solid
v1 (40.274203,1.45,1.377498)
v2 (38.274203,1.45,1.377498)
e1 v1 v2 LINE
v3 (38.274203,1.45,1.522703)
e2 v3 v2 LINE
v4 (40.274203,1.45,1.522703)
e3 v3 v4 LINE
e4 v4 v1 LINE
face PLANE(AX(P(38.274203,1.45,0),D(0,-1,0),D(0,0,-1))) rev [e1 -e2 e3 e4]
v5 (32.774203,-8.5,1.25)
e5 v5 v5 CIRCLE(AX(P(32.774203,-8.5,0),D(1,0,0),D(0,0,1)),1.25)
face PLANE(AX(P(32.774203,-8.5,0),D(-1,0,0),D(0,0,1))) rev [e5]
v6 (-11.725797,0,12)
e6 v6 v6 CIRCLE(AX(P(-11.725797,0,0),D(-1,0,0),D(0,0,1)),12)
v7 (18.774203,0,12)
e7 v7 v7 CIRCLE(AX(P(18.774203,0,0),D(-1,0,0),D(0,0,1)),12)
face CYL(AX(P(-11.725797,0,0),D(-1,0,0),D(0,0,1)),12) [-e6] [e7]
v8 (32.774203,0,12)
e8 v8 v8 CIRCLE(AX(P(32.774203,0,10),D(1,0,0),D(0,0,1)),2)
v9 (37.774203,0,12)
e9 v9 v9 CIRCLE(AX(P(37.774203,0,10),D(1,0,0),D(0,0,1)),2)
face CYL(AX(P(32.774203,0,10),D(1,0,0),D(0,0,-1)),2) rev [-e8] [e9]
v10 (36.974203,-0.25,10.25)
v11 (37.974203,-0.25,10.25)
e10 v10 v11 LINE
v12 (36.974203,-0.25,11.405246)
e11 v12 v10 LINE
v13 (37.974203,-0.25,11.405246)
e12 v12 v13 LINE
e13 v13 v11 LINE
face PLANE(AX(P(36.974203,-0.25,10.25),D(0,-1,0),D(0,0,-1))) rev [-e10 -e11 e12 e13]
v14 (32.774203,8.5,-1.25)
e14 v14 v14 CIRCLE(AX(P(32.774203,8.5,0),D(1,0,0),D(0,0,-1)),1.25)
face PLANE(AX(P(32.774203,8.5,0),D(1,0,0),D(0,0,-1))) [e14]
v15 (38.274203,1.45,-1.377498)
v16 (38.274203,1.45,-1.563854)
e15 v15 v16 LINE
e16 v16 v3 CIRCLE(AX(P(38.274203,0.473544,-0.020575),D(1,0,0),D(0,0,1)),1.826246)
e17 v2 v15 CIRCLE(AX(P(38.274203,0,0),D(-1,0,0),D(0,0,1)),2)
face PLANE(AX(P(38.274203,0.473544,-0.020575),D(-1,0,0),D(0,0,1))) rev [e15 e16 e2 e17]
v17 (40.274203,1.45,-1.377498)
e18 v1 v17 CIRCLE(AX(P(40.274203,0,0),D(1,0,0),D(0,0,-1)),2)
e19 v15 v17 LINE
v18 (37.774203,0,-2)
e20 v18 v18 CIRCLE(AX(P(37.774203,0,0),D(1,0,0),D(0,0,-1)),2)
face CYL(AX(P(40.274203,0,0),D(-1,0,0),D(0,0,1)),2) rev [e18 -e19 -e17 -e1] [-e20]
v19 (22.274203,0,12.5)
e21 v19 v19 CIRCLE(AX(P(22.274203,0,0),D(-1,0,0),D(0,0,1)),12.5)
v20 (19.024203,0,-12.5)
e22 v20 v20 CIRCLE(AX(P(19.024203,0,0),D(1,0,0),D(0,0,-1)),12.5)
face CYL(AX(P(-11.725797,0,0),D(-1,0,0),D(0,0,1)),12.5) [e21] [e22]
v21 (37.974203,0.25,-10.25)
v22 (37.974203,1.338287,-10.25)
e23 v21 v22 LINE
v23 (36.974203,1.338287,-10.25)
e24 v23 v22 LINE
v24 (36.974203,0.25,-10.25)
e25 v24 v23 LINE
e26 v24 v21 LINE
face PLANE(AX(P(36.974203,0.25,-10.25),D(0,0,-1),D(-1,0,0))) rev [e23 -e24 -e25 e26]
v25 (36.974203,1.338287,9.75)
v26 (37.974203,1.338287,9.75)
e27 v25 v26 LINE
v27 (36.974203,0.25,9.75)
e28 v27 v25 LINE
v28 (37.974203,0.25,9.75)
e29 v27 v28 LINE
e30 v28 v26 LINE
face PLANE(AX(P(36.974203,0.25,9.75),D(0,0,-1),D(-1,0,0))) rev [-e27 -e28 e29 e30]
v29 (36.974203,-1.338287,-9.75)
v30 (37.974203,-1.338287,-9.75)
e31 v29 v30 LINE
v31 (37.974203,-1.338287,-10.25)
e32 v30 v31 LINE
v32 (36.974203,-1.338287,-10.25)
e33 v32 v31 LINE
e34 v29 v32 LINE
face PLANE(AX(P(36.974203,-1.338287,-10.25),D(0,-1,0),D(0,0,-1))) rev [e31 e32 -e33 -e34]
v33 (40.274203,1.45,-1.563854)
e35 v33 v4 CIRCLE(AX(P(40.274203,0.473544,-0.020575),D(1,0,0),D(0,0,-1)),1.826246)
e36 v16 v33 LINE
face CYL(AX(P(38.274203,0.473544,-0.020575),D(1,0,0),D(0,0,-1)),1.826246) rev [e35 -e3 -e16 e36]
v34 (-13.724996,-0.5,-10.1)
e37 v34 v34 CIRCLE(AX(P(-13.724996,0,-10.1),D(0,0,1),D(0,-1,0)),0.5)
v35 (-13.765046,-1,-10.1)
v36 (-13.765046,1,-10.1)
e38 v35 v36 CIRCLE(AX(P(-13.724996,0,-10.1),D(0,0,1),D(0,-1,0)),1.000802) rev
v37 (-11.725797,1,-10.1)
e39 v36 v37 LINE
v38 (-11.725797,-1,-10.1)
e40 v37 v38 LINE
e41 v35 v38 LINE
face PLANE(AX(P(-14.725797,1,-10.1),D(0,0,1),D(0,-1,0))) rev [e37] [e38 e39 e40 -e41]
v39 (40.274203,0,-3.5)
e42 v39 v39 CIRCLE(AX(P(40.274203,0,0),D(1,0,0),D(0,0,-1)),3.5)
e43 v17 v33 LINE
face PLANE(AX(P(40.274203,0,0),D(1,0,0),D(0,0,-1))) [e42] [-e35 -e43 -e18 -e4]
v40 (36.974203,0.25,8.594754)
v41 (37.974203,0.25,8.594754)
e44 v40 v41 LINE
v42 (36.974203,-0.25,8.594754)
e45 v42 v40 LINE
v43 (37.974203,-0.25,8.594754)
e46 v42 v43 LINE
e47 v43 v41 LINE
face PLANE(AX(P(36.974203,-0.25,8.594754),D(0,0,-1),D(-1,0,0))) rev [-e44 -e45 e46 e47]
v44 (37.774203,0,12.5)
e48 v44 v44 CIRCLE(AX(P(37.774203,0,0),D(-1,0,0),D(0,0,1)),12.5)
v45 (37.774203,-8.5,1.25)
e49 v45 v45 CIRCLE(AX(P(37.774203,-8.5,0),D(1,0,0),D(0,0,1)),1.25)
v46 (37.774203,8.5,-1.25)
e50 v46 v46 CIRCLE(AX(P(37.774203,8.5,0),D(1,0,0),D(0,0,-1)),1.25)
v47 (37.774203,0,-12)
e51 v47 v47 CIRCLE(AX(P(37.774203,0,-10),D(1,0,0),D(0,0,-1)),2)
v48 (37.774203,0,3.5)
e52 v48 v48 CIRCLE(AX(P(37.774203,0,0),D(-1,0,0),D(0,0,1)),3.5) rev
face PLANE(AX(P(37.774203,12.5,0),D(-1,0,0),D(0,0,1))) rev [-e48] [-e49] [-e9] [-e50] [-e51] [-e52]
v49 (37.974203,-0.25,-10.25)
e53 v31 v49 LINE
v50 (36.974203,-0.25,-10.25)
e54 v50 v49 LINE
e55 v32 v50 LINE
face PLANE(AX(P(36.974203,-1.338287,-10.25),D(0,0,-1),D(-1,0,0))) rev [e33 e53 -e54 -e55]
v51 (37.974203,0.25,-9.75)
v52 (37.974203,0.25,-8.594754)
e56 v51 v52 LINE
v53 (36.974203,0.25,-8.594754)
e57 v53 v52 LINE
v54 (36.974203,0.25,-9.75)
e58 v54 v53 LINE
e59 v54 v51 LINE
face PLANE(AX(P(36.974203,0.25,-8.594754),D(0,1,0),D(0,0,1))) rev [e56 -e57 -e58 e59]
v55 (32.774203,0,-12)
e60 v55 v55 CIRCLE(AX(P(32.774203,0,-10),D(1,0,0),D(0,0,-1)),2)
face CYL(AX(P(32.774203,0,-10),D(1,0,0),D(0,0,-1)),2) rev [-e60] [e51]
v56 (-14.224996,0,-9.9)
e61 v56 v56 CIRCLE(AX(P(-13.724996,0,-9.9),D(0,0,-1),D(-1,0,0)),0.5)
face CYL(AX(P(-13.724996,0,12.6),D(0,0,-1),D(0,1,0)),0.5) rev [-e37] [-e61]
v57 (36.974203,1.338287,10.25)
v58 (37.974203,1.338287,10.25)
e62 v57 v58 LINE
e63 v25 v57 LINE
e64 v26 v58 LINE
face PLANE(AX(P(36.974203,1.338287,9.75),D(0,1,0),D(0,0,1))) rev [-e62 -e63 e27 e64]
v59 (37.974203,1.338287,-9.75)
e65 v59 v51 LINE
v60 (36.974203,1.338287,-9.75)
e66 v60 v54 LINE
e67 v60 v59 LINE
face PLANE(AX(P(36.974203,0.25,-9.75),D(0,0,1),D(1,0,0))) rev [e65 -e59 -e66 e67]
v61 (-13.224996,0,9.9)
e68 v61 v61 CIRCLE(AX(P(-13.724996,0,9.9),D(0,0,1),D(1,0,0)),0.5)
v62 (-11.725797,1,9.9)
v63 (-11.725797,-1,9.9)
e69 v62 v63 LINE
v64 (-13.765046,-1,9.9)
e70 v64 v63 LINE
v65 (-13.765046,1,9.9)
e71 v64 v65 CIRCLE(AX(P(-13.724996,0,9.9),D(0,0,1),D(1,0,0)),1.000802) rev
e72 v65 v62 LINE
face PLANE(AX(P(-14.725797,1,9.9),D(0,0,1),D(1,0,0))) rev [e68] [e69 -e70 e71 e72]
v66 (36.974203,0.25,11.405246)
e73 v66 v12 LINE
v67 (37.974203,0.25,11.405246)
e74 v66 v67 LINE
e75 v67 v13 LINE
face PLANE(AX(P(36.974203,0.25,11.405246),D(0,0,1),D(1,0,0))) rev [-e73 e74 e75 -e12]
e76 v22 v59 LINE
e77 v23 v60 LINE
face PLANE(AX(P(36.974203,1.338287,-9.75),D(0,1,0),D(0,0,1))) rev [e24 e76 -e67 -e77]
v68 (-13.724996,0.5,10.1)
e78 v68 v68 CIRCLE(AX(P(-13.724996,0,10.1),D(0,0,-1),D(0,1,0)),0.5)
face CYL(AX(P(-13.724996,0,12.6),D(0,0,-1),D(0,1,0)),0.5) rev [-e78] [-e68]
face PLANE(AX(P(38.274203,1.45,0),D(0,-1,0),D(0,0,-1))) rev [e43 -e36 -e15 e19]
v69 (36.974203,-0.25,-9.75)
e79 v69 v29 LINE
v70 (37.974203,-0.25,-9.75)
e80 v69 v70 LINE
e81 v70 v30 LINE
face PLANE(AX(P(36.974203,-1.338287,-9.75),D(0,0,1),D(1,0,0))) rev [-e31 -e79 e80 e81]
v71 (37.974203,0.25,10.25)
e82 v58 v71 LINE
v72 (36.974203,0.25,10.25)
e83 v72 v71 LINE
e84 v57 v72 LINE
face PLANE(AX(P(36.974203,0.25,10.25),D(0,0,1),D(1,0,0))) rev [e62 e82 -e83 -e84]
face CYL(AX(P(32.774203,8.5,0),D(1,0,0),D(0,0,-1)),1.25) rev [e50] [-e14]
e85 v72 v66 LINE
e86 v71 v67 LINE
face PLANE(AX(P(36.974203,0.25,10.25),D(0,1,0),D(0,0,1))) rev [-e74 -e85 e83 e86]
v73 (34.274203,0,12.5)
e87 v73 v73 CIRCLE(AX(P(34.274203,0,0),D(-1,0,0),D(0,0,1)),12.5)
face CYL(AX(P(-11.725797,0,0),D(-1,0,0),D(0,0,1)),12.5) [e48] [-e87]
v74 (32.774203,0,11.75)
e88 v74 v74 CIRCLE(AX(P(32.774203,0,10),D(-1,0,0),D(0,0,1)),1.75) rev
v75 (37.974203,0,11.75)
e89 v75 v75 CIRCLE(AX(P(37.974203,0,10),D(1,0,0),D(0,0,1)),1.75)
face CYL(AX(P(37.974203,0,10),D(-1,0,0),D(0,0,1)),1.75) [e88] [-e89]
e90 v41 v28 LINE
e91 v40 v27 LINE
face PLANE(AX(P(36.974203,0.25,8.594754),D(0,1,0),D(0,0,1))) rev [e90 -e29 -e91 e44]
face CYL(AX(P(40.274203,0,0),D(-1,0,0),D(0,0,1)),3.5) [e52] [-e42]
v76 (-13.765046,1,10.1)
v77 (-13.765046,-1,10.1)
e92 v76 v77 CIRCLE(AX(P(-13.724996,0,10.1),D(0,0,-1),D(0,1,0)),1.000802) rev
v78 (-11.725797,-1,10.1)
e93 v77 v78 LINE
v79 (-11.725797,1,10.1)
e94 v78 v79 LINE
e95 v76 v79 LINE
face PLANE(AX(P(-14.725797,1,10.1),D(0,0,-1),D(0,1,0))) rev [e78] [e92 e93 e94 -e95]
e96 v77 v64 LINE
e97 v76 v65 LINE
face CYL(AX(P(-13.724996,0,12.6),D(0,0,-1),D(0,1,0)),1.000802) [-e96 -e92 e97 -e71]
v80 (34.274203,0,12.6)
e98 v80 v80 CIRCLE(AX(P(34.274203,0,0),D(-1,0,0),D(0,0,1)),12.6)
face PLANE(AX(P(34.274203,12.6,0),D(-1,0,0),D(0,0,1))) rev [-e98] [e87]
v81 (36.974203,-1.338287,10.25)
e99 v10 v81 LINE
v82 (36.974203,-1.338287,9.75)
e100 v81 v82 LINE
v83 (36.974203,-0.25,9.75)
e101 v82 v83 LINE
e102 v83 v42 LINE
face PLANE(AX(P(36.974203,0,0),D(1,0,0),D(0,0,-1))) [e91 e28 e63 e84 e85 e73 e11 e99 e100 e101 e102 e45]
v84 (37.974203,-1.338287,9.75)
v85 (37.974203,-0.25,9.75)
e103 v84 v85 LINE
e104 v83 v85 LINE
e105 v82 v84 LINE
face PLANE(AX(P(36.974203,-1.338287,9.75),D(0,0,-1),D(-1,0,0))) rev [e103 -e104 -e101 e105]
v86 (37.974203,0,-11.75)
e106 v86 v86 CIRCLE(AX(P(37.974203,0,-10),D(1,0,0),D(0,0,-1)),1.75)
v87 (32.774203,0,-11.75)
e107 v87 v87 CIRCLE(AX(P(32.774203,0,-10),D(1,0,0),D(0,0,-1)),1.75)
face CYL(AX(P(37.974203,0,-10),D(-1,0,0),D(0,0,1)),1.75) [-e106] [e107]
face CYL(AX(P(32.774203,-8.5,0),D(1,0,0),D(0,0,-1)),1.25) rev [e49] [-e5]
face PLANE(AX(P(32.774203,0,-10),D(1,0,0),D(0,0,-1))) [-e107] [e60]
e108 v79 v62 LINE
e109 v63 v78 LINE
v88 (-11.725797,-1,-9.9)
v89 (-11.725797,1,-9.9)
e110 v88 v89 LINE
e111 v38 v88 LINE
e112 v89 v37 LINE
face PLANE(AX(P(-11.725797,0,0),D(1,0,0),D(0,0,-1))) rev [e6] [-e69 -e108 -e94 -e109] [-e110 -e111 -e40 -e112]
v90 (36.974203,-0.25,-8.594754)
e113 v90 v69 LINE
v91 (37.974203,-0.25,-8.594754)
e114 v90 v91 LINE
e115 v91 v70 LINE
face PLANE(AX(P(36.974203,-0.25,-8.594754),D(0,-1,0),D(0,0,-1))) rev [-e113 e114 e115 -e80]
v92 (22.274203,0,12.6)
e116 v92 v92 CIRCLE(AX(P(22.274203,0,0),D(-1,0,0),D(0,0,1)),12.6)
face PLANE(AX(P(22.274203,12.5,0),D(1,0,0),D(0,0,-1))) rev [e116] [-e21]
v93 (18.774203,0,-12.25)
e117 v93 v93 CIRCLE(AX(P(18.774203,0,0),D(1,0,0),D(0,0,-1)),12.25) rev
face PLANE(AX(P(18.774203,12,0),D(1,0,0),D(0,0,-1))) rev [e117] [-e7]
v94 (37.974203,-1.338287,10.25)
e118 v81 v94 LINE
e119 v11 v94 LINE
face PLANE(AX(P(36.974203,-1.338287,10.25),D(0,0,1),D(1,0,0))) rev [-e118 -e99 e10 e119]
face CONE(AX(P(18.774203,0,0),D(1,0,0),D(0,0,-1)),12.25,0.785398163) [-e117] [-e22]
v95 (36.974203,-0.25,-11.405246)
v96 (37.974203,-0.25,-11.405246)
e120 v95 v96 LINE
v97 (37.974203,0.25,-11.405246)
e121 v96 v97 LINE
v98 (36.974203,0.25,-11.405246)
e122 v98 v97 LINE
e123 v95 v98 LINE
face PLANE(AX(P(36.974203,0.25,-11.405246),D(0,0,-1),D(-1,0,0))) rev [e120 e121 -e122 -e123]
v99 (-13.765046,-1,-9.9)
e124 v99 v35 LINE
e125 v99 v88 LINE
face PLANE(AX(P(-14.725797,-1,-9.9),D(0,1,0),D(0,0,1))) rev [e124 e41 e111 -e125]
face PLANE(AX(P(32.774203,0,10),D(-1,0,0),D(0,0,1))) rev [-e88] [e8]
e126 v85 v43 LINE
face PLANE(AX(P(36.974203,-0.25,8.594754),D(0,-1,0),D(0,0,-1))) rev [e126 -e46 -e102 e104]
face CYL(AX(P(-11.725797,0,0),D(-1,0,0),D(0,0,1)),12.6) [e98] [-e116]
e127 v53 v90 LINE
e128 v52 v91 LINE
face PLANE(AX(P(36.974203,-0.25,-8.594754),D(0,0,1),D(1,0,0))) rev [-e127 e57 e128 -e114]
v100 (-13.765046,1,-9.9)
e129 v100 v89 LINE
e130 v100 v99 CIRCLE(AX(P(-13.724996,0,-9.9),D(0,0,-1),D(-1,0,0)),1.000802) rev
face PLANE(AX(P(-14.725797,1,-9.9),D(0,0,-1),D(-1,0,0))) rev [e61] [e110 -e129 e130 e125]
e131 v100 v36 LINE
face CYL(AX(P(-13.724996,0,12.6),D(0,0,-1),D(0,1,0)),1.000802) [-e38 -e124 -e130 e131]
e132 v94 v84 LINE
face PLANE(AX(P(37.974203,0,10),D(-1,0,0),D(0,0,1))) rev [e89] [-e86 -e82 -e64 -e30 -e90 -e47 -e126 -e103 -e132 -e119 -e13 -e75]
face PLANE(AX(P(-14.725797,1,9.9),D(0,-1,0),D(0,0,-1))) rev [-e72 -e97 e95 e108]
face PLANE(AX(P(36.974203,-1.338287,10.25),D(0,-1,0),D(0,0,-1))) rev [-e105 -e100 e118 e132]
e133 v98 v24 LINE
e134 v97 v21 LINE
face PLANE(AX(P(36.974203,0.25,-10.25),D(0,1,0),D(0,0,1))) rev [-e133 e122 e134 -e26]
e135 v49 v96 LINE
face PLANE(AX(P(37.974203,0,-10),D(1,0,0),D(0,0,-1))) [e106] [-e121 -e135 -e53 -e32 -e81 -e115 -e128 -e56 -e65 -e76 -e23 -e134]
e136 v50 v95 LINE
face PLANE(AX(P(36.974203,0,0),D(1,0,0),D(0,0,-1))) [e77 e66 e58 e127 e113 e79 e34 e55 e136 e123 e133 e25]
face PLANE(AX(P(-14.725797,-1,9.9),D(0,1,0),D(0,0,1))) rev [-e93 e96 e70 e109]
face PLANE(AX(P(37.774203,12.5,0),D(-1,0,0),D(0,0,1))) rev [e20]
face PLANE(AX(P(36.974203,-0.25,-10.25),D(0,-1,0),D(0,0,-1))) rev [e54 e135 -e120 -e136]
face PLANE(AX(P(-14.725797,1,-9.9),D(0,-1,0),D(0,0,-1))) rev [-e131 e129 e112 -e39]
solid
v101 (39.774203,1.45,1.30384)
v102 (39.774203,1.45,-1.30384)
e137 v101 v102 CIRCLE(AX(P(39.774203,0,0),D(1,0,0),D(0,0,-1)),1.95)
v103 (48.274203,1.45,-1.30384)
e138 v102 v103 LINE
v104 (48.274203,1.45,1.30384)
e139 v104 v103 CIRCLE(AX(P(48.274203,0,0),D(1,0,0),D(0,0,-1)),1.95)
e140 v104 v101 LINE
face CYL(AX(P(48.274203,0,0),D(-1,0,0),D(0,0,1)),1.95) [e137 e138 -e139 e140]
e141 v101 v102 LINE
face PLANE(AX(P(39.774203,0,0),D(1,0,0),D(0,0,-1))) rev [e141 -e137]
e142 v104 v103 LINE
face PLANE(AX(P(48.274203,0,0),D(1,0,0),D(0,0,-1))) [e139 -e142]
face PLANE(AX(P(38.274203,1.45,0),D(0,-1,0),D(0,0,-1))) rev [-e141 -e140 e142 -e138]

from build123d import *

# Parameters (mm, degrees)
SKETCH3_R               = 3.5
SKETCH3_R_2             = 2
BOSS_EXTRUDE1_DEPTH     = 2.5
BOSS_EXTRUDE2_START     = 2
SKETCH4_R               = 1.95
BOSS_EXTRUDE2_DEPTH     = 8.5
CUT_EXTRUDE1_DEPTH      = 10
CHAMFER1_SIZE           = 0.25
SKETCH6_R               = 2
CUT_EXTRUDE2_DEPTH      = 5
SKETCH7_R               = 1.75
BOSS_EXTRUDE3_DEPTH     = 5.2
CUT_EXTRUDE4_DEPTH      = 1
SKETCH9_R               = 1.25
CUT_EXTRUDE5_DEPTH      = 5
SKETCH11_W              = 0.2
SKETCH11_H              = 2
BOSS_EXTRUDE4_DEPTH     = 3
CUT_EXTRUDE6_START      = -20.2
CUT_EXTRUDE6_DEPTH      = 20.2
CUT_EXTRUDE7_DEPTH      = 55.812850986
CUT_EXTRUDE7_DEPTH_BACK = 55.812850986
SKETCH13_R              = 0.5


# Read off the part's stored shape, not the designer's step: Cut-Extrude6
with BuildPart() as part:
    # Sketch1 → Revolve1 (revolve)
    with BuildSketch(Plane.XY, mode=Mode.PRIVATE) as revolve1_sk:
        Polygon((-11.725797436, 0), (-11.725797436, 12), (18.774202564, 12), (18.774202564, 12.5), (22.274202564, 12.5), (22.274202564, 12.6), (34.274202564, 12.6), (34.274202564, 12.5), (37.774202564, 12.5), (37.774202564, 0), align=None)
    revolve(revolve1_sk.sketch.rotate(Axis((-11.725797436, 0, 0), (1, 0, 0)), 90), axis=Axis((-11.725797436, 0, 0), (1, 0, 0)))

    # Sketch3 → Boss-Extrude1 (add)
    with BuildSketch(Plane(origin=(37.774202564, 0, 0), x_dir=(0, 0, -1), z_dir=(1, 0, 0))):
        with Locations(Location((0, 0, 0), (0, 0, 180))):
            Circle(SKETCH3_R)
        Circle(SKETCH3_R_2, mode=Mode.SUBTRACT)
    extrude(amount=BOSS_EXTRUDE1_DEPTH)


with BuildPart() as body_2:
    # Sketch4 → Boss-Extrude2 (new body)
    with BuildSketch(Plane(origin=(37.774202564, 0, 0), x_dir=(0, 0, -1), z_dir=(1, 0, 0)).offset(BOSS_EXTRUDE2_START)):
        Circle(SKETCH4_R)
    extrude(amount=BOSS_EXTRUDE2_DEPTH)


with BuildPart() as cut_extrude1_tool:
    # Sketch5 → Cut-Extrude1 (new body)
    with BuildSketch(Plane(origin=(48.274202564, 0, 0), x_dir=(0, 0, -1), z_dir=(1, 0, 0))):
        with BuildLine():
            Line((0, 1.45), (1.563854219, 1.45))
            ThreePointArc((1.563854219, 1.45), (0.020575485, 2.299790468), (-1.52270325, 1.45))
            Line((-1.52270325, 1.45), (0, 1.45))
        make_face()
    extrude(amount=-CUT_EXTRUDE1_DEPTH)


with BuildPart() as part_1:
    add(part.part)

    # Cut-Extrude1: cut by cut_extrude1_tool
    add(cut_extrude1_tool.part, mode=Mode.SUBTRACT)

    # Chamfer1
    chamfer1_edges = [part_1.edges().sort_by_distance(p)[0] for p in [
        (18.774202564, 0, -12.5),
    ]]
    chamfer(chamfer1_edges, length=CHAMFER1_SIZE)

    # Sketch6 → Cut-Extrude2 (cut)
    with BuildSketch(Plane(origin=(37.774202564, 0, 0), x_dir=(0, 0, -1), z_dir=(1, 0, 0))):
        with Locations((10, 0)):
            Circle(SKETCH6_R)
        with Locations(Location((-10, 0, 0), (0, 0, 180))):
            Circle(SKETCH6_R)
    extrude(amount=-CUT_EXTRUDE2_DEPTH, mode=Mode.SUBTRACT)

    # Sketch7 → Boss-Extrude3 (add)
    with BuildSketch(Plane(origin=(32.774202564, 0, 0), x_dir=(0, 0, -1), z_dir=(1, 0, 0))):
        with Locations((10, 0)):
            Circle(SKETCH7_R)
        with Locations(Location((-10, 0, 0), (0, 0, 180))):
            Circle(SKETCH7_R)
    extrude(amount=BOSS_EXTRUDE3_DEPTH)

    # Sketch8 → Cut-Extrude4 (cut)
    with BuildSketch(Plane(origin=(37.974202564, 0, 0), x_dir=(0, 0, -1), z_dir=(1, 0, 0))):
        Polygon((8.594754122, -0.25), (8.594754122, 0.25), (9.75, 0.25), (9.75, 1.338286548), (10.25, 1.338286548), (10.25, 0.25), (11.405245878, 0.25), (11.405245878, -0.25), (10.25, -0.25), (10.25, -1.338286548), (9.75, -1.338286548), (9.75, -0.25), align=None)
        Polygon((-10.25, -0.25), (-11.405245878, -0.25), (-11.405245878, 0.25), (-10.25, 0.25), (-10.25, 1.338286548), (-9.75, 1.338286548), (-9.75, 0.25), (-8.594754122, 0.25), (-8.594754122, -0.25), (-9.75, -0.25), (-9.75, -1.338286548), (-10.25, -1.338286548), align=None)
    extrude(amount=-CUT_EXTRUDE4_DEPTH, mode=Mode.SUBTRACT)

    # Sketch9 → Cut-Extrude5 (cut)
    with BuildSketch(Plane(origin=(37.774202564, 0, 0), x_dir=(0, 0, -1), z_dir=(1, 0, 0))):
        with Locations((0, 8.5)):
            Circle(SKETCH9_R)
        with Locations(Location((0, -8.5, 0), (0, 0, 180))):
            Circle(SKETCH9_R)
    extrude(amount=-CUT_EXTRUDE5_DEPTH, mode=Mode.SUBTRACT)

    # Sketch11 → Boss-Extrude4 (add)
    with BuildSketch(Plane.ZY.offset(11.725797436)):
        with Locations((10, 0)):
            Rectangle(SKETCH11_W, SKETCH11_H)
        with Locations((-10, 0)):
            Rectangle(SKETCH11_W, SKETCH11_H)
    extrude(amount=BOSS_EXTRUDE4_DEPTH)

    # Cut-Extrude6 outline → Cut-Extrude6 (cut)
    with BuildSketch(Plane(origin=(0, 0, -10.1), x_dir=(-1, 0, 0), z_dir=(0, 0, -1)).offset(CUT_EXTRUDE6_START)):
        with BuildLine():
            ThreePointArc((13.765046185, 1), (14.446690478, 0.693369124), (14.725797436, 0))
            Line((14.725797436, 0), (14.725797436, 1))
            Line((14.725797436, 1), (13.765046185, 1))
        make_face()
        with BuildLine():
            ThreePointArc((14.725797436, 0), (14.446690478, -0.693369124), (13.765046185, -1))
            Line((13.765046185, -1), (14.725797436, -1))
            Line((14.725797436, -1), (14.725797436, 0))
        make_face()
    extrude(amount=CUT_EXTRUDE6_DEPTH, mode=Mode.SUBTRACT)

    # Sketch13 → Cut-Extrude7 (cut, two sides: drawn at the far end of the back side and taken through both)
    with BuildSketch(Plane(origin=(0, 0, -10.1), x_dir=(-1, 0, 0), z_dir=(0, 0, -1)).offset(-CUT_EXTRUDE7_DEPTH_BACK)):
        with Locations((13.724995738, 0)):
            Circle(SKETCH13_R)
    extrude(amount=CUT_EXTRUDE7_DEPTH + CUT_EXTRUDE7_DEPTH_BACK, mode=Mode.SUBTRACT)


with BuildPart() as body_2_1:
    add(body_2.part)

    # Cut-Extrude1: cut by cut_extrude1_tool
    add(cut_extrude1_tool.part, mode=Mode.SUBTRACT)


solid = Compound([part_1.part, body_2_1.part])
